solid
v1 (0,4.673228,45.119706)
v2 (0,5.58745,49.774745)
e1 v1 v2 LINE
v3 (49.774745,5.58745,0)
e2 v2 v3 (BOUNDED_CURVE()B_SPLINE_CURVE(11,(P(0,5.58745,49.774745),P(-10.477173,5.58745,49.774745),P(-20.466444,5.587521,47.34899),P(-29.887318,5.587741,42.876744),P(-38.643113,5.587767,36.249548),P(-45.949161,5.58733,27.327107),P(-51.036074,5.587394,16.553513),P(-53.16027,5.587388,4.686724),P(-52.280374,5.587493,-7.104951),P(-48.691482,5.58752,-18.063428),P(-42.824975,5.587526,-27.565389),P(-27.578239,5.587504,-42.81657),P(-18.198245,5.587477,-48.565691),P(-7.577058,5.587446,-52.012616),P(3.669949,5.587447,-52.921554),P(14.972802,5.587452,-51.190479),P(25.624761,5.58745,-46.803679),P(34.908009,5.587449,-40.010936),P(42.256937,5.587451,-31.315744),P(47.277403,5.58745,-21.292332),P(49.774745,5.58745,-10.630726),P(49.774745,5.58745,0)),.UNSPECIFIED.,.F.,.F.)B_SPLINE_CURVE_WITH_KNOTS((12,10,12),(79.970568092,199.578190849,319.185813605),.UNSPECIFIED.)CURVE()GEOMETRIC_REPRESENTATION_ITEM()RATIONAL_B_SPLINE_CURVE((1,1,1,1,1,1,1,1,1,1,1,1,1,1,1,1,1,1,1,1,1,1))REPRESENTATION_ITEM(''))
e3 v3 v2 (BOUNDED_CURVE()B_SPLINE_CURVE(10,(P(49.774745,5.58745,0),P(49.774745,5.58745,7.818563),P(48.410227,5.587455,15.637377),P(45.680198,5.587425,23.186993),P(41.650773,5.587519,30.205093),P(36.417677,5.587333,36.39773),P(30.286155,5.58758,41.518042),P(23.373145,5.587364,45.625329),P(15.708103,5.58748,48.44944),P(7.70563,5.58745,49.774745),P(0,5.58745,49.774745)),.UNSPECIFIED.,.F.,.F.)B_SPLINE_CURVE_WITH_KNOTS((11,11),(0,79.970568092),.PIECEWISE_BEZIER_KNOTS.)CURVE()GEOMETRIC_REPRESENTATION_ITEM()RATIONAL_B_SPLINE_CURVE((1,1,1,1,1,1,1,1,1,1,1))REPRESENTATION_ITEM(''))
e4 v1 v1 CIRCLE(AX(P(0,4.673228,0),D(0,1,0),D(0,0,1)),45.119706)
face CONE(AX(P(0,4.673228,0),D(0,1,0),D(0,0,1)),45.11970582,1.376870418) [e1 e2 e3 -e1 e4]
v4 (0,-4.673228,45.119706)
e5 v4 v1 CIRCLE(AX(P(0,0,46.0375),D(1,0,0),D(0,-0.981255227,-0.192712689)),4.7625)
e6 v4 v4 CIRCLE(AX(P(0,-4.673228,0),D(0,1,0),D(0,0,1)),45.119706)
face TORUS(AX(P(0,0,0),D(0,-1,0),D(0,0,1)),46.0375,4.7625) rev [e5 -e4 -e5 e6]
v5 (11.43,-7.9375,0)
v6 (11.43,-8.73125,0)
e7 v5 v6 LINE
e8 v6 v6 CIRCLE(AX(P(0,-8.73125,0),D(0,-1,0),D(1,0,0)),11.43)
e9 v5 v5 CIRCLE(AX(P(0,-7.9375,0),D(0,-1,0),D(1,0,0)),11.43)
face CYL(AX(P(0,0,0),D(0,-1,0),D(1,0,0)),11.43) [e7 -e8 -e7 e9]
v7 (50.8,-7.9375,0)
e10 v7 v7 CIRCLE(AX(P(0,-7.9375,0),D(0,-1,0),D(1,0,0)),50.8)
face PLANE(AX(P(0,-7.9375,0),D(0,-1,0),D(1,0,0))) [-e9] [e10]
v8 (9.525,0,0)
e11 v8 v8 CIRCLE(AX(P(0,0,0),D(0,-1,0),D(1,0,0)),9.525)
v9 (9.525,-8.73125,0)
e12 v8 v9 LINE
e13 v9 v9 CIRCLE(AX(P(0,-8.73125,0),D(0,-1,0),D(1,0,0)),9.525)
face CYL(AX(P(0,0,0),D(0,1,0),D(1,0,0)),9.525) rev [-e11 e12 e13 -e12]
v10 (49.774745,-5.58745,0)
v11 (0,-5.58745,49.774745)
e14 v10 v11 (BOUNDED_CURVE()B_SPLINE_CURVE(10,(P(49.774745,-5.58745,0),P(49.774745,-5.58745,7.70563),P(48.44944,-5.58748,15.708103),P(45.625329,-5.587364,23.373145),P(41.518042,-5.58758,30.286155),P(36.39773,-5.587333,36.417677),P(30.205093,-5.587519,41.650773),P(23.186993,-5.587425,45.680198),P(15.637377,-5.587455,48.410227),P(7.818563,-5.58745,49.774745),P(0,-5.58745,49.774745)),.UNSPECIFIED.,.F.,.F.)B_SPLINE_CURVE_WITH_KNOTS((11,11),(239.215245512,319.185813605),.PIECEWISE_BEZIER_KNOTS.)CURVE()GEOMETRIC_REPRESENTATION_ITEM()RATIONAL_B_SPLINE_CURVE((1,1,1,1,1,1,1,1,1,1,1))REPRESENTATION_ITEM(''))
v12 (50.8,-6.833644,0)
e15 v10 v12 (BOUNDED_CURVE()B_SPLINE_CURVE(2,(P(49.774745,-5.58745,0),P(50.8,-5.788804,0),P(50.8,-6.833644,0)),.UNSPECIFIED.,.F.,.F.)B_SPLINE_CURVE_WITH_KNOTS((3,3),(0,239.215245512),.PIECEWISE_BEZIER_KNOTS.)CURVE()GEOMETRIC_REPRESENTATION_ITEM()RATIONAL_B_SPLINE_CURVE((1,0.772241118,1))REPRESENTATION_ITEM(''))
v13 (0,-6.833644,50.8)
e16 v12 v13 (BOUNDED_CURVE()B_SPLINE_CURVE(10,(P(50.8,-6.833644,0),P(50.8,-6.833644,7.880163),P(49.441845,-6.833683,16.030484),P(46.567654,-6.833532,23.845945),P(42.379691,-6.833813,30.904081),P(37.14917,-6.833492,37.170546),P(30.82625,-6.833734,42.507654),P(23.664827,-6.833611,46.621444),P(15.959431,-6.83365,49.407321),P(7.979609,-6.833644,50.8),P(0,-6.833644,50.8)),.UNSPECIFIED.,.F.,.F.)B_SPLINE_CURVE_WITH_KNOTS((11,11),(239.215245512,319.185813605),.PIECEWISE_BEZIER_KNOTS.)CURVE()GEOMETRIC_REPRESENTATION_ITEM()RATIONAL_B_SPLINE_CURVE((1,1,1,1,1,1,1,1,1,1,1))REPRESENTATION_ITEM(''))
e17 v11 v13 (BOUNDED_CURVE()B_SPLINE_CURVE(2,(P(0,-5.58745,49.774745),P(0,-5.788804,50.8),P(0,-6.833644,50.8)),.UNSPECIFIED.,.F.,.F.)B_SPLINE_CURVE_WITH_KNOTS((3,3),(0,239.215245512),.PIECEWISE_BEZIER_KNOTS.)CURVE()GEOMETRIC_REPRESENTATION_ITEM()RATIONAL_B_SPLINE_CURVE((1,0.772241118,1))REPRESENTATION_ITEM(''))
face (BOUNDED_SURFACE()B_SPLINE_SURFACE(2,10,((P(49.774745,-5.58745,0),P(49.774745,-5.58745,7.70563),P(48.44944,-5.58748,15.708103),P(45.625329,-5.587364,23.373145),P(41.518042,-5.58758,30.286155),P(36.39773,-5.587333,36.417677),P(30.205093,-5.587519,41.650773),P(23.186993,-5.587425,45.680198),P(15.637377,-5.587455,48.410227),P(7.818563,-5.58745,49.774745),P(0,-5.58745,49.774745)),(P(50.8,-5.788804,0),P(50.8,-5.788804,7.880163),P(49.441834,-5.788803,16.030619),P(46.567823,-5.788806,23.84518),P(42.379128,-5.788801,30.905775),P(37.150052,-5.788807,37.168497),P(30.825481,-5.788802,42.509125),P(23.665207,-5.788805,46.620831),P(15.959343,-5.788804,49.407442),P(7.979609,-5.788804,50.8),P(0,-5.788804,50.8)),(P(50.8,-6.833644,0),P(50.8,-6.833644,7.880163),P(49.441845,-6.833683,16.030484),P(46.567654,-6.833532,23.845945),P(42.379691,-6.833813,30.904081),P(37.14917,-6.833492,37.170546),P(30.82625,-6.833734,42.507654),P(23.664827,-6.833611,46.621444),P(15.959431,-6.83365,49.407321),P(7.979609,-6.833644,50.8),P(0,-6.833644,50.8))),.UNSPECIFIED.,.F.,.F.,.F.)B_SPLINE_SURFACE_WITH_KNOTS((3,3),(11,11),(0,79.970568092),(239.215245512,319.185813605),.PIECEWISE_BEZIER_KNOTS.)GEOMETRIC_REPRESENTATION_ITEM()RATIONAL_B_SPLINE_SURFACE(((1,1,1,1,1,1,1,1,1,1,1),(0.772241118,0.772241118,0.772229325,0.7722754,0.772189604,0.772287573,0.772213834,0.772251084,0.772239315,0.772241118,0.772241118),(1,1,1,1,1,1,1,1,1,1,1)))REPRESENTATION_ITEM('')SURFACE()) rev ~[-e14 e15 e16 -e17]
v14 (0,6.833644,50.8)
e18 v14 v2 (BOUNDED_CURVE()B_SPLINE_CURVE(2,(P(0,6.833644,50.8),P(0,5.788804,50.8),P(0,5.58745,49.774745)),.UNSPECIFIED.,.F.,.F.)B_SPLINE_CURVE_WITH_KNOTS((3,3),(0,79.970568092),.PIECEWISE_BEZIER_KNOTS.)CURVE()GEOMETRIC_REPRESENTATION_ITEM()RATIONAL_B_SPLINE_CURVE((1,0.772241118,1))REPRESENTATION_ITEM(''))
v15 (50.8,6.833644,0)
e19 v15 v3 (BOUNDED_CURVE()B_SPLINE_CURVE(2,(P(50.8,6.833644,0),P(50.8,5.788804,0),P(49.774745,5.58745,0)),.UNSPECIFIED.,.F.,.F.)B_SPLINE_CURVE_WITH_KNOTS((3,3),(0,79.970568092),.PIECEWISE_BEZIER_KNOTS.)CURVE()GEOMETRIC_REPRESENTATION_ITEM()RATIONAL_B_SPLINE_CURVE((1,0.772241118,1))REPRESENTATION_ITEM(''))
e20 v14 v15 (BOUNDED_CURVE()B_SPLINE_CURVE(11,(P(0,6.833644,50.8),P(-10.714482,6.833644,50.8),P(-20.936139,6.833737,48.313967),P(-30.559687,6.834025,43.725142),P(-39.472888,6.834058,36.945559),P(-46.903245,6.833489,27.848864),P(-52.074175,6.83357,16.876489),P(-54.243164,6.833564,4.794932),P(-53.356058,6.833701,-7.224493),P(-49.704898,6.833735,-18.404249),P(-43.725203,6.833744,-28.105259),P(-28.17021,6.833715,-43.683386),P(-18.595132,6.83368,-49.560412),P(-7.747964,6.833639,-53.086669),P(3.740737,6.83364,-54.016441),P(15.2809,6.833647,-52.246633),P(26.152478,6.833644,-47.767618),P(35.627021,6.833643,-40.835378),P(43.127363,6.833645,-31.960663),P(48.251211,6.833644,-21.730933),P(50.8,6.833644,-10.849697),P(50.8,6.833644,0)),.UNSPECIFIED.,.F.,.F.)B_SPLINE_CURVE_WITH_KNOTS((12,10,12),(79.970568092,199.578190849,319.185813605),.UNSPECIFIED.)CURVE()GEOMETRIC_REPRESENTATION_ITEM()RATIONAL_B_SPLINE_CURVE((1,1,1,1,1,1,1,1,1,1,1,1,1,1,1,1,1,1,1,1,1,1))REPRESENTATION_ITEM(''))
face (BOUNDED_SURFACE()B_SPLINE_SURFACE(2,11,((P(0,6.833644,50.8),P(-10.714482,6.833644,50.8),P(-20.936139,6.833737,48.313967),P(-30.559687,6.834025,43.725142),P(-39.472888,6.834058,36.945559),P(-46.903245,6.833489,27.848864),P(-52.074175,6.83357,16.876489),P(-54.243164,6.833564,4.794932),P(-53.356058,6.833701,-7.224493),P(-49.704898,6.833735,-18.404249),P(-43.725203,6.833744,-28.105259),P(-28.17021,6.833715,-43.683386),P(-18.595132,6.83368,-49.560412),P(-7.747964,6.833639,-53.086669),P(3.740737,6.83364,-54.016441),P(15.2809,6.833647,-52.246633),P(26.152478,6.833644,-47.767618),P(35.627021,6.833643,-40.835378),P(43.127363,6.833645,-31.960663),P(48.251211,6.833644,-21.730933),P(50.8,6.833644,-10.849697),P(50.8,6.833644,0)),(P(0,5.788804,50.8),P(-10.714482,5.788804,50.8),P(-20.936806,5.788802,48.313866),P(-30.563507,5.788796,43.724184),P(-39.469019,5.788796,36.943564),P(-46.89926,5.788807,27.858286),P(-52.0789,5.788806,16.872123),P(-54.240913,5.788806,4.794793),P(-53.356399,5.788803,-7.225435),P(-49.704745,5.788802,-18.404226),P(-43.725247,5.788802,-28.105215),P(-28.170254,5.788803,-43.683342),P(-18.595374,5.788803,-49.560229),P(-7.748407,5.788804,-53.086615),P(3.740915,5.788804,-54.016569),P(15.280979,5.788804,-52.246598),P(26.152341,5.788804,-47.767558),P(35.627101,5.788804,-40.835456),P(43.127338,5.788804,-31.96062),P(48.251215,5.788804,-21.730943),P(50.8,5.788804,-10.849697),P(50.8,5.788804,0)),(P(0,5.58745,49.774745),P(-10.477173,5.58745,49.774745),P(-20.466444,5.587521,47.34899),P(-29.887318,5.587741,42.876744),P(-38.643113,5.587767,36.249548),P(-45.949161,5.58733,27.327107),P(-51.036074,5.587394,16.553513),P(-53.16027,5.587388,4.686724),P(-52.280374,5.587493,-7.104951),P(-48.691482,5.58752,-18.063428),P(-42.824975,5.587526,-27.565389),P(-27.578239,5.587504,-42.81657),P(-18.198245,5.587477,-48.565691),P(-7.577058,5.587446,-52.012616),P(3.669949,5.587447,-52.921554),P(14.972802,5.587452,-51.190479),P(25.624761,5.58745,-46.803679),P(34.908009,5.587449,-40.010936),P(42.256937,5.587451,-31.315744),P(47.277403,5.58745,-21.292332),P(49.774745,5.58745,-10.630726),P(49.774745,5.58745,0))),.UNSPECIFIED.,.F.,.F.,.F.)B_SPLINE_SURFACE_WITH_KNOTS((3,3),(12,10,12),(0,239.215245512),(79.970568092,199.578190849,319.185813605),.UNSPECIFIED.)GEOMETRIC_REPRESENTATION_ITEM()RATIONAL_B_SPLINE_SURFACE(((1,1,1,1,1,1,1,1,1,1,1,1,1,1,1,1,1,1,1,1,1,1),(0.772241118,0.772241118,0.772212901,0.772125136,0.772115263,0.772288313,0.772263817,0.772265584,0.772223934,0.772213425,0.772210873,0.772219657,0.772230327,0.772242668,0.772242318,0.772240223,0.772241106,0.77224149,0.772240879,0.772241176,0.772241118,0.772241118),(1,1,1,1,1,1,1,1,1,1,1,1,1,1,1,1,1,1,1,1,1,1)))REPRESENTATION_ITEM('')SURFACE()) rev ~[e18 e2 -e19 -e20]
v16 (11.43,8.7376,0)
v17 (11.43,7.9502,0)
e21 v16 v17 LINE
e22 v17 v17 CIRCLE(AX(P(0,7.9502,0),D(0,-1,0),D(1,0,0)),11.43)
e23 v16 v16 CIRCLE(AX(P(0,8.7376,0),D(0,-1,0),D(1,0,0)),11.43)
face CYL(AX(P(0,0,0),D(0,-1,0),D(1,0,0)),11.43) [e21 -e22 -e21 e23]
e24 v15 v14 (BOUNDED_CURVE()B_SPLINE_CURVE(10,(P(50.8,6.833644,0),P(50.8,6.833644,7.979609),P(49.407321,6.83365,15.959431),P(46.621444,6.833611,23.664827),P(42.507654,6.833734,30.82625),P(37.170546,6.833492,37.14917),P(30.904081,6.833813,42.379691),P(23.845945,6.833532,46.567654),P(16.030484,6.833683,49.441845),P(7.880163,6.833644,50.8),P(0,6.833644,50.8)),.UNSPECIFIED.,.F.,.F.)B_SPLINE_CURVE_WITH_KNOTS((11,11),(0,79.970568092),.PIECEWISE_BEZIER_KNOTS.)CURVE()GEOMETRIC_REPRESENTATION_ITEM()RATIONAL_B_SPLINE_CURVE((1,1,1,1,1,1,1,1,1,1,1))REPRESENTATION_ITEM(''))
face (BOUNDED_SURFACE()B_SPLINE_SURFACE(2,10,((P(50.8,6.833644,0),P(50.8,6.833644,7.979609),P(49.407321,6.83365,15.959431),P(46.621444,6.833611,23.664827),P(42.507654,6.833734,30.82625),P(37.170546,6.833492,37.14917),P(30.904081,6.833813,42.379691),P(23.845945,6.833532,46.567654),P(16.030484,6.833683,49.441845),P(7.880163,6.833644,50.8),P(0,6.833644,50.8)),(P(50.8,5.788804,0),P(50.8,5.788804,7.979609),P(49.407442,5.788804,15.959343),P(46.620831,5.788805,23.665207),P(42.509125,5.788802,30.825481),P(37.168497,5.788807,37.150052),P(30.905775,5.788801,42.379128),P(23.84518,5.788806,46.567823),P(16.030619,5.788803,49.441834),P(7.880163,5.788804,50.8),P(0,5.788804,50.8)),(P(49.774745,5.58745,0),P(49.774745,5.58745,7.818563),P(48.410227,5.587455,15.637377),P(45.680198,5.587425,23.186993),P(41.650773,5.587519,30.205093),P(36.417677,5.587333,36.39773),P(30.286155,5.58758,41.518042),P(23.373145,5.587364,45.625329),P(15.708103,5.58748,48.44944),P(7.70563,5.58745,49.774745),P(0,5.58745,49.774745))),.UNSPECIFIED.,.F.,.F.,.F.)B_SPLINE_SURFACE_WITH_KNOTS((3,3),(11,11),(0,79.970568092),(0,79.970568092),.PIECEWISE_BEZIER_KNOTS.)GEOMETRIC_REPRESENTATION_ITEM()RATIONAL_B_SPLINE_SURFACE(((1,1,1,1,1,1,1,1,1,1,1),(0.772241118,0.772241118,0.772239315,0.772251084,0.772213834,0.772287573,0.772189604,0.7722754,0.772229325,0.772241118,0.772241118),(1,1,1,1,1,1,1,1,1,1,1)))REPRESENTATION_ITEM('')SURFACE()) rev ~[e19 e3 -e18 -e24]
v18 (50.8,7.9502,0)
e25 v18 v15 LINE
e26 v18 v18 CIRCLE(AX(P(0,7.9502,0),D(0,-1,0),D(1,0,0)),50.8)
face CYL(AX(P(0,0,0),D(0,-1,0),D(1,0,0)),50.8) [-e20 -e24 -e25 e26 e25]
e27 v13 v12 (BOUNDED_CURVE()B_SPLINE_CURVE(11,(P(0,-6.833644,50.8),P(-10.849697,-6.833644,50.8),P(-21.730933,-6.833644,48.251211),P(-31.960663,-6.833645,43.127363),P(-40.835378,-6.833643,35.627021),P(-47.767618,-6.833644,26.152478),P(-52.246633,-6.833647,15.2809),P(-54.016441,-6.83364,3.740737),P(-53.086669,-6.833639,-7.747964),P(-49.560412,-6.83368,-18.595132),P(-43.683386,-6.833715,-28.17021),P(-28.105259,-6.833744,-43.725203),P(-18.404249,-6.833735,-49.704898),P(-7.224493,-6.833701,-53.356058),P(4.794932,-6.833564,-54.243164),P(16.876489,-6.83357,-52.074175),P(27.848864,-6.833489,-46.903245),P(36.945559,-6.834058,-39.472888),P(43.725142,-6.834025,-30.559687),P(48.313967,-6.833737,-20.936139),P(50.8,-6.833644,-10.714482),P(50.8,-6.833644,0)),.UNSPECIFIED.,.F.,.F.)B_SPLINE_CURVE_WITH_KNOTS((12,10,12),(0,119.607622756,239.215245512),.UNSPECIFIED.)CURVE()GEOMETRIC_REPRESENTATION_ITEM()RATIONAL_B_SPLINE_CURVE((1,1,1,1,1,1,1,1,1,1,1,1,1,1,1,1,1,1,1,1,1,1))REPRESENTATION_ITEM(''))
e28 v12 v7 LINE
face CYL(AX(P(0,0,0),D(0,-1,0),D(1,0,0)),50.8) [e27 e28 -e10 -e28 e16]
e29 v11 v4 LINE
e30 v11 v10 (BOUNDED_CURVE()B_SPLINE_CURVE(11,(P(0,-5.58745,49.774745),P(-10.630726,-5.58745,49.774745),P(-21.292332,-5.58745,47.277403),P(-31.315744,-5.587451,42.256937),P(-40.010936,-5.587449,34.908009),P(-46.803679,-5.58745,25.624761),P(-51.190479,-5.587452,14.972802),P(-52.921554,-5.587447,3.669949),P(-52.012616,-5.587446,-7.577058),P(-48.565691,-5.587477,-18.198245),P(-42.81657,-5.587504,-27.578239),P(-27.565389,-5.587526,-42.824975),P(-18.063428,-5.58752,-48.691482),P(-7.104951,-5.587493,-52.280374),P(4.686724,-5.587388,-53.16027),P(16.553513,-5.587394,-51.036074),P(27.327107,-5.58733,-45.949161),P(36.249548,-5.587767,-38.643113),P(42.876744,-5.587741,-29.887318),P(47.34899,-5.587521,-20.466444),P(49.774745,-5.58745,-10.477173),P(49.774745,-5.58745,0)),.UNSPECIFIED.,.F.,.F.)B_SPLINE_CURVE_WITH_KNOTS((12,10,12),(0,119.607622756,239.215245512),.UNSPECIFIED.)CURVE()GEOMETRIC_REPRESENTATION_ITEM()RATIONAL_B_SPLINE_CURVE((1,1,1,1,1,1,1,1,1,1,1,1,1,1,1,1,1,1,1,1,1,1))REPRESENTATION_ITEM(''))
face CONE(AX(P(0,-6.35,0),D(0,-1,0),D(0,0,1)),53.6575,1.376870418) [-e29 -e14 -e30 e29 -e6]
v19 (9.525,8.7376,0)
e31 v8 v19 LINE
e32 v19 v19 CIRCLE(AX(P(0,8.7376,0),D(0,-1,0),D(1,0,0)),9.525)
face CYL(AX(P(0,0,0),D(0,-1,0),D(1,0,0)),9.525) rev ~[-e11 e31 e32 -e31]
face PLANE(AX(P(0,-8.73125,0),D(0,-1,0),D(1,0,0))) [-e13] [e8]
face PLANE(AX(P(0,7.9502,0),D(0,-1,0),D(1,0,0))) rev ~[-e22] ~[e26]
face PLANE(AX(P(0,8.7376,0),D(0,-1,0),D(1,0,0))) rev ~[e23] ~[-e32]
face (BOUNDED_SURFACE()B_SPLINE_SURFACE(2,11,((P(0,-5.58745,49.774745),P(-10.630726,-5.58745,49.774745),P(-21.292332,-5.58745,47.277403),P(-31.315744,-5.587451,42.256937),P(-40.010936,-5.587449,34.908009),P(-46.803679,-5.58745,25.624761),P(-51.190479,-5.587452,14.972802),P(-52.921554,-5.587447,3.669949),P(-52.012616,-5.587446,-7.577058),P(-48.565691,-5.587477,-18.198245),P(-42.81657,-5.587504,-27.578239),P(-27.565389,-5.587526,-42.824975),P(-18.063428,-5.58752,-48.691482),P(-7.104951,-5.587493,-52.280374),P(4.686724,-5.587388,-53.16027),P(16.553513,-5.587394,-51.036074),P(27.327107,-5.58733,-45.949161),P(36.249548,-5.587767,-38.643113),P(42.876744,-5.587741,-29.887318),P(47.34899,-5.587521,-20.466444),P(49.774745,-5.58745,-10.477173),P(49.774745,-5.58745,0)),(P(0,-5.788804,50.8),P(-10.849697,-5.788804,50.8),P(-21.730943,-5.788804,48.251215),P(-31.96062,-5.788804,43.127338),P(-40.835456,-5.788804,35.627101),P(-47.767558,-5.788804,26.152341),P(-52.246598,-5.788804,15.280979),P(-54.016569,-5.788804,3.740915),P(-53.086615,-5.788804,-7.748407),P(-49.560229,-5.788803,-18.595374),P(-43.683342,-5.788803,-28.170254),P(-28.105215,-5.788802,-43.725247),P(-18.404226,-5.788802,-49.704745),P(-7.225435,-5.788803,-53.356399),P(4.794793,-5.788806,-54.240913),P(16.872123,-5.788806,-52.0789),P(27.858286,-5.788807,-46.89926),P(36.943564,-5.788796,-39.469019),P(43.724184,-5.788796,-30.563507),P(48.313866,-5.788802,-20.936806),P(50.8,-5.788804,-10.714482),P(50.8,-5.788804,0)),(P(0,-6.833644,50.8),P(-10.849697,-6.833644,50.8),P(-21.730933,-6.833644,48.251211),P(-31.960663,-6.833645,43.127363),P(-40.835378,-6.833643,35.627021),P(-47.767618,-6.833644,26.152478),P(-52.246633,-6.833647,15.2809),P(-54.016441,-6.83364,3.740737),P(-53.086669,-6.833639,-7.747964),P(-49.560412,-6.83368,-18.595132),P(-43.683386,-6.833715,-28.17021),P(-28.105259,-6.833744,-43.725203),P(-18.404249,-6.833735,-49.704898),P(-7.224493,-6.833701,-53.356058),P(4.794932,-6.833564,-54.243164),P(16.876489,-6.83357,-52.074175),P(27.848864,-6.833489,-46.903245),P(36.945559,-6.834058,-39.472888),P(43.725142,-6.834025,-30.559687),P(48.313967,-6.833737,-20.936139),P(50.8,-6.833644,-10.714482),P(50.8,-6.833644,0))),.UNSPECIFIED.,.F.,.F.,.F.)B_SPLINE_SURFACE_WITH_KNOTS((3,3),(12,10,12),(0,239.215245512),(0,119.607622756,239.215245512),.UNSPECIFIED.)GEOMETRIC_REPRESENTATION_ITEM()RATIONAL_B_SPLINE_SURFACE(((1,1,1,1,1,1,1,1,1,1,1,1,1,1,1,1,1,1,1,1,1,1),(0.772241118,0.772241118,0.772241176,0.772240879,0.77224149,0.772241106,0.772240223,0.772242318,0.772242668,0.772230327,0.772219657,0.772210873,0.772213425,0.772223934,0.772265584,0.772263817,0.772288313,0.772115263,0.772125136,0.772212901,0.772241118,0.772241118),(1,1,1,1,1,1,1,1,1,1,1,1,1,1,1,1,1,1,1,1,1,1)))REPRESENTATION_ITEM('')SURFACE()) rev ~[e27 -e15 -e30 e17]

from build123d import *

# Parameters (mm, degrees)
F0_R          = 11.43
F0_R_2        = 9.525
F1_DEPTH      = 8.73125
F1_DEPTH_BACK = 8.7376
F0_R_3        = 50.8
F2_DEPTH      = 7.9375
F2_DEPTH_BACK = 7.9502
F5_R          = 1.27


with BuildPart() as f1:
    # F0 (on Front) → F1 (new body, two sides)
    with BuildSketch(Plane.XZ) as f1_sk:
        Circle(F0_R)
        Circle(F0_R_2, mode=Mode.SUBTRACT)
    extrude(amount=F1_DEPTH)
    extrude(f1_sk.sketch, amount=-F1_DEPTH_BACK)

    # F0 (on Front) → F2 (join, two sides)
    with BuildSketch(Plane.XZ) as f2_sk:
        Circle(F0_R_3)
        Circle(F0_R, mode=Mode.SUBTRACT)
    extrude(amount=F2_DEPTH)
    extrude(f2_sk.sketch, amount=-F2_DEPTH_BACK)

    # F3 (on Right) → F4 (revolve, cut)
    with BuildSketch(Plane.YZ):
        with BuildLine():
            Line((-6.35, 53.6575), (-4.6732280163, 45.1197058197))
            ThreePointArc((-4.6732280163, 45.1197058197), (0, 41.275), (4.6732280163, 45.1197058197))
            Line((4.6732280163, 45.1197058197), (6.35, 53.6575))
            Line((6.35, 53.6575), (0, 53.6575))
            Line((0, 53.6575), (-6.35, 53.6575))
        make_face()
    revolve(axis=Axis((0, 33.8884852827, 0), (0, 1, 0)), mode=Mode.SUBTRACT)

    # F5
    f5_edges = [f1.edges().sort_by_distance(p)[0] for p in [
        (35.921024, 5.788804, 35.921024),
        (-35.921024, 5.788804, -35.921024),
        (-35.921024, -5.788804, -35.921024),
        (35.921024, -5.788804, 35.921024),
    ]]
    fillet(f5_edges, radius=F5_R)


solid = f1.part
